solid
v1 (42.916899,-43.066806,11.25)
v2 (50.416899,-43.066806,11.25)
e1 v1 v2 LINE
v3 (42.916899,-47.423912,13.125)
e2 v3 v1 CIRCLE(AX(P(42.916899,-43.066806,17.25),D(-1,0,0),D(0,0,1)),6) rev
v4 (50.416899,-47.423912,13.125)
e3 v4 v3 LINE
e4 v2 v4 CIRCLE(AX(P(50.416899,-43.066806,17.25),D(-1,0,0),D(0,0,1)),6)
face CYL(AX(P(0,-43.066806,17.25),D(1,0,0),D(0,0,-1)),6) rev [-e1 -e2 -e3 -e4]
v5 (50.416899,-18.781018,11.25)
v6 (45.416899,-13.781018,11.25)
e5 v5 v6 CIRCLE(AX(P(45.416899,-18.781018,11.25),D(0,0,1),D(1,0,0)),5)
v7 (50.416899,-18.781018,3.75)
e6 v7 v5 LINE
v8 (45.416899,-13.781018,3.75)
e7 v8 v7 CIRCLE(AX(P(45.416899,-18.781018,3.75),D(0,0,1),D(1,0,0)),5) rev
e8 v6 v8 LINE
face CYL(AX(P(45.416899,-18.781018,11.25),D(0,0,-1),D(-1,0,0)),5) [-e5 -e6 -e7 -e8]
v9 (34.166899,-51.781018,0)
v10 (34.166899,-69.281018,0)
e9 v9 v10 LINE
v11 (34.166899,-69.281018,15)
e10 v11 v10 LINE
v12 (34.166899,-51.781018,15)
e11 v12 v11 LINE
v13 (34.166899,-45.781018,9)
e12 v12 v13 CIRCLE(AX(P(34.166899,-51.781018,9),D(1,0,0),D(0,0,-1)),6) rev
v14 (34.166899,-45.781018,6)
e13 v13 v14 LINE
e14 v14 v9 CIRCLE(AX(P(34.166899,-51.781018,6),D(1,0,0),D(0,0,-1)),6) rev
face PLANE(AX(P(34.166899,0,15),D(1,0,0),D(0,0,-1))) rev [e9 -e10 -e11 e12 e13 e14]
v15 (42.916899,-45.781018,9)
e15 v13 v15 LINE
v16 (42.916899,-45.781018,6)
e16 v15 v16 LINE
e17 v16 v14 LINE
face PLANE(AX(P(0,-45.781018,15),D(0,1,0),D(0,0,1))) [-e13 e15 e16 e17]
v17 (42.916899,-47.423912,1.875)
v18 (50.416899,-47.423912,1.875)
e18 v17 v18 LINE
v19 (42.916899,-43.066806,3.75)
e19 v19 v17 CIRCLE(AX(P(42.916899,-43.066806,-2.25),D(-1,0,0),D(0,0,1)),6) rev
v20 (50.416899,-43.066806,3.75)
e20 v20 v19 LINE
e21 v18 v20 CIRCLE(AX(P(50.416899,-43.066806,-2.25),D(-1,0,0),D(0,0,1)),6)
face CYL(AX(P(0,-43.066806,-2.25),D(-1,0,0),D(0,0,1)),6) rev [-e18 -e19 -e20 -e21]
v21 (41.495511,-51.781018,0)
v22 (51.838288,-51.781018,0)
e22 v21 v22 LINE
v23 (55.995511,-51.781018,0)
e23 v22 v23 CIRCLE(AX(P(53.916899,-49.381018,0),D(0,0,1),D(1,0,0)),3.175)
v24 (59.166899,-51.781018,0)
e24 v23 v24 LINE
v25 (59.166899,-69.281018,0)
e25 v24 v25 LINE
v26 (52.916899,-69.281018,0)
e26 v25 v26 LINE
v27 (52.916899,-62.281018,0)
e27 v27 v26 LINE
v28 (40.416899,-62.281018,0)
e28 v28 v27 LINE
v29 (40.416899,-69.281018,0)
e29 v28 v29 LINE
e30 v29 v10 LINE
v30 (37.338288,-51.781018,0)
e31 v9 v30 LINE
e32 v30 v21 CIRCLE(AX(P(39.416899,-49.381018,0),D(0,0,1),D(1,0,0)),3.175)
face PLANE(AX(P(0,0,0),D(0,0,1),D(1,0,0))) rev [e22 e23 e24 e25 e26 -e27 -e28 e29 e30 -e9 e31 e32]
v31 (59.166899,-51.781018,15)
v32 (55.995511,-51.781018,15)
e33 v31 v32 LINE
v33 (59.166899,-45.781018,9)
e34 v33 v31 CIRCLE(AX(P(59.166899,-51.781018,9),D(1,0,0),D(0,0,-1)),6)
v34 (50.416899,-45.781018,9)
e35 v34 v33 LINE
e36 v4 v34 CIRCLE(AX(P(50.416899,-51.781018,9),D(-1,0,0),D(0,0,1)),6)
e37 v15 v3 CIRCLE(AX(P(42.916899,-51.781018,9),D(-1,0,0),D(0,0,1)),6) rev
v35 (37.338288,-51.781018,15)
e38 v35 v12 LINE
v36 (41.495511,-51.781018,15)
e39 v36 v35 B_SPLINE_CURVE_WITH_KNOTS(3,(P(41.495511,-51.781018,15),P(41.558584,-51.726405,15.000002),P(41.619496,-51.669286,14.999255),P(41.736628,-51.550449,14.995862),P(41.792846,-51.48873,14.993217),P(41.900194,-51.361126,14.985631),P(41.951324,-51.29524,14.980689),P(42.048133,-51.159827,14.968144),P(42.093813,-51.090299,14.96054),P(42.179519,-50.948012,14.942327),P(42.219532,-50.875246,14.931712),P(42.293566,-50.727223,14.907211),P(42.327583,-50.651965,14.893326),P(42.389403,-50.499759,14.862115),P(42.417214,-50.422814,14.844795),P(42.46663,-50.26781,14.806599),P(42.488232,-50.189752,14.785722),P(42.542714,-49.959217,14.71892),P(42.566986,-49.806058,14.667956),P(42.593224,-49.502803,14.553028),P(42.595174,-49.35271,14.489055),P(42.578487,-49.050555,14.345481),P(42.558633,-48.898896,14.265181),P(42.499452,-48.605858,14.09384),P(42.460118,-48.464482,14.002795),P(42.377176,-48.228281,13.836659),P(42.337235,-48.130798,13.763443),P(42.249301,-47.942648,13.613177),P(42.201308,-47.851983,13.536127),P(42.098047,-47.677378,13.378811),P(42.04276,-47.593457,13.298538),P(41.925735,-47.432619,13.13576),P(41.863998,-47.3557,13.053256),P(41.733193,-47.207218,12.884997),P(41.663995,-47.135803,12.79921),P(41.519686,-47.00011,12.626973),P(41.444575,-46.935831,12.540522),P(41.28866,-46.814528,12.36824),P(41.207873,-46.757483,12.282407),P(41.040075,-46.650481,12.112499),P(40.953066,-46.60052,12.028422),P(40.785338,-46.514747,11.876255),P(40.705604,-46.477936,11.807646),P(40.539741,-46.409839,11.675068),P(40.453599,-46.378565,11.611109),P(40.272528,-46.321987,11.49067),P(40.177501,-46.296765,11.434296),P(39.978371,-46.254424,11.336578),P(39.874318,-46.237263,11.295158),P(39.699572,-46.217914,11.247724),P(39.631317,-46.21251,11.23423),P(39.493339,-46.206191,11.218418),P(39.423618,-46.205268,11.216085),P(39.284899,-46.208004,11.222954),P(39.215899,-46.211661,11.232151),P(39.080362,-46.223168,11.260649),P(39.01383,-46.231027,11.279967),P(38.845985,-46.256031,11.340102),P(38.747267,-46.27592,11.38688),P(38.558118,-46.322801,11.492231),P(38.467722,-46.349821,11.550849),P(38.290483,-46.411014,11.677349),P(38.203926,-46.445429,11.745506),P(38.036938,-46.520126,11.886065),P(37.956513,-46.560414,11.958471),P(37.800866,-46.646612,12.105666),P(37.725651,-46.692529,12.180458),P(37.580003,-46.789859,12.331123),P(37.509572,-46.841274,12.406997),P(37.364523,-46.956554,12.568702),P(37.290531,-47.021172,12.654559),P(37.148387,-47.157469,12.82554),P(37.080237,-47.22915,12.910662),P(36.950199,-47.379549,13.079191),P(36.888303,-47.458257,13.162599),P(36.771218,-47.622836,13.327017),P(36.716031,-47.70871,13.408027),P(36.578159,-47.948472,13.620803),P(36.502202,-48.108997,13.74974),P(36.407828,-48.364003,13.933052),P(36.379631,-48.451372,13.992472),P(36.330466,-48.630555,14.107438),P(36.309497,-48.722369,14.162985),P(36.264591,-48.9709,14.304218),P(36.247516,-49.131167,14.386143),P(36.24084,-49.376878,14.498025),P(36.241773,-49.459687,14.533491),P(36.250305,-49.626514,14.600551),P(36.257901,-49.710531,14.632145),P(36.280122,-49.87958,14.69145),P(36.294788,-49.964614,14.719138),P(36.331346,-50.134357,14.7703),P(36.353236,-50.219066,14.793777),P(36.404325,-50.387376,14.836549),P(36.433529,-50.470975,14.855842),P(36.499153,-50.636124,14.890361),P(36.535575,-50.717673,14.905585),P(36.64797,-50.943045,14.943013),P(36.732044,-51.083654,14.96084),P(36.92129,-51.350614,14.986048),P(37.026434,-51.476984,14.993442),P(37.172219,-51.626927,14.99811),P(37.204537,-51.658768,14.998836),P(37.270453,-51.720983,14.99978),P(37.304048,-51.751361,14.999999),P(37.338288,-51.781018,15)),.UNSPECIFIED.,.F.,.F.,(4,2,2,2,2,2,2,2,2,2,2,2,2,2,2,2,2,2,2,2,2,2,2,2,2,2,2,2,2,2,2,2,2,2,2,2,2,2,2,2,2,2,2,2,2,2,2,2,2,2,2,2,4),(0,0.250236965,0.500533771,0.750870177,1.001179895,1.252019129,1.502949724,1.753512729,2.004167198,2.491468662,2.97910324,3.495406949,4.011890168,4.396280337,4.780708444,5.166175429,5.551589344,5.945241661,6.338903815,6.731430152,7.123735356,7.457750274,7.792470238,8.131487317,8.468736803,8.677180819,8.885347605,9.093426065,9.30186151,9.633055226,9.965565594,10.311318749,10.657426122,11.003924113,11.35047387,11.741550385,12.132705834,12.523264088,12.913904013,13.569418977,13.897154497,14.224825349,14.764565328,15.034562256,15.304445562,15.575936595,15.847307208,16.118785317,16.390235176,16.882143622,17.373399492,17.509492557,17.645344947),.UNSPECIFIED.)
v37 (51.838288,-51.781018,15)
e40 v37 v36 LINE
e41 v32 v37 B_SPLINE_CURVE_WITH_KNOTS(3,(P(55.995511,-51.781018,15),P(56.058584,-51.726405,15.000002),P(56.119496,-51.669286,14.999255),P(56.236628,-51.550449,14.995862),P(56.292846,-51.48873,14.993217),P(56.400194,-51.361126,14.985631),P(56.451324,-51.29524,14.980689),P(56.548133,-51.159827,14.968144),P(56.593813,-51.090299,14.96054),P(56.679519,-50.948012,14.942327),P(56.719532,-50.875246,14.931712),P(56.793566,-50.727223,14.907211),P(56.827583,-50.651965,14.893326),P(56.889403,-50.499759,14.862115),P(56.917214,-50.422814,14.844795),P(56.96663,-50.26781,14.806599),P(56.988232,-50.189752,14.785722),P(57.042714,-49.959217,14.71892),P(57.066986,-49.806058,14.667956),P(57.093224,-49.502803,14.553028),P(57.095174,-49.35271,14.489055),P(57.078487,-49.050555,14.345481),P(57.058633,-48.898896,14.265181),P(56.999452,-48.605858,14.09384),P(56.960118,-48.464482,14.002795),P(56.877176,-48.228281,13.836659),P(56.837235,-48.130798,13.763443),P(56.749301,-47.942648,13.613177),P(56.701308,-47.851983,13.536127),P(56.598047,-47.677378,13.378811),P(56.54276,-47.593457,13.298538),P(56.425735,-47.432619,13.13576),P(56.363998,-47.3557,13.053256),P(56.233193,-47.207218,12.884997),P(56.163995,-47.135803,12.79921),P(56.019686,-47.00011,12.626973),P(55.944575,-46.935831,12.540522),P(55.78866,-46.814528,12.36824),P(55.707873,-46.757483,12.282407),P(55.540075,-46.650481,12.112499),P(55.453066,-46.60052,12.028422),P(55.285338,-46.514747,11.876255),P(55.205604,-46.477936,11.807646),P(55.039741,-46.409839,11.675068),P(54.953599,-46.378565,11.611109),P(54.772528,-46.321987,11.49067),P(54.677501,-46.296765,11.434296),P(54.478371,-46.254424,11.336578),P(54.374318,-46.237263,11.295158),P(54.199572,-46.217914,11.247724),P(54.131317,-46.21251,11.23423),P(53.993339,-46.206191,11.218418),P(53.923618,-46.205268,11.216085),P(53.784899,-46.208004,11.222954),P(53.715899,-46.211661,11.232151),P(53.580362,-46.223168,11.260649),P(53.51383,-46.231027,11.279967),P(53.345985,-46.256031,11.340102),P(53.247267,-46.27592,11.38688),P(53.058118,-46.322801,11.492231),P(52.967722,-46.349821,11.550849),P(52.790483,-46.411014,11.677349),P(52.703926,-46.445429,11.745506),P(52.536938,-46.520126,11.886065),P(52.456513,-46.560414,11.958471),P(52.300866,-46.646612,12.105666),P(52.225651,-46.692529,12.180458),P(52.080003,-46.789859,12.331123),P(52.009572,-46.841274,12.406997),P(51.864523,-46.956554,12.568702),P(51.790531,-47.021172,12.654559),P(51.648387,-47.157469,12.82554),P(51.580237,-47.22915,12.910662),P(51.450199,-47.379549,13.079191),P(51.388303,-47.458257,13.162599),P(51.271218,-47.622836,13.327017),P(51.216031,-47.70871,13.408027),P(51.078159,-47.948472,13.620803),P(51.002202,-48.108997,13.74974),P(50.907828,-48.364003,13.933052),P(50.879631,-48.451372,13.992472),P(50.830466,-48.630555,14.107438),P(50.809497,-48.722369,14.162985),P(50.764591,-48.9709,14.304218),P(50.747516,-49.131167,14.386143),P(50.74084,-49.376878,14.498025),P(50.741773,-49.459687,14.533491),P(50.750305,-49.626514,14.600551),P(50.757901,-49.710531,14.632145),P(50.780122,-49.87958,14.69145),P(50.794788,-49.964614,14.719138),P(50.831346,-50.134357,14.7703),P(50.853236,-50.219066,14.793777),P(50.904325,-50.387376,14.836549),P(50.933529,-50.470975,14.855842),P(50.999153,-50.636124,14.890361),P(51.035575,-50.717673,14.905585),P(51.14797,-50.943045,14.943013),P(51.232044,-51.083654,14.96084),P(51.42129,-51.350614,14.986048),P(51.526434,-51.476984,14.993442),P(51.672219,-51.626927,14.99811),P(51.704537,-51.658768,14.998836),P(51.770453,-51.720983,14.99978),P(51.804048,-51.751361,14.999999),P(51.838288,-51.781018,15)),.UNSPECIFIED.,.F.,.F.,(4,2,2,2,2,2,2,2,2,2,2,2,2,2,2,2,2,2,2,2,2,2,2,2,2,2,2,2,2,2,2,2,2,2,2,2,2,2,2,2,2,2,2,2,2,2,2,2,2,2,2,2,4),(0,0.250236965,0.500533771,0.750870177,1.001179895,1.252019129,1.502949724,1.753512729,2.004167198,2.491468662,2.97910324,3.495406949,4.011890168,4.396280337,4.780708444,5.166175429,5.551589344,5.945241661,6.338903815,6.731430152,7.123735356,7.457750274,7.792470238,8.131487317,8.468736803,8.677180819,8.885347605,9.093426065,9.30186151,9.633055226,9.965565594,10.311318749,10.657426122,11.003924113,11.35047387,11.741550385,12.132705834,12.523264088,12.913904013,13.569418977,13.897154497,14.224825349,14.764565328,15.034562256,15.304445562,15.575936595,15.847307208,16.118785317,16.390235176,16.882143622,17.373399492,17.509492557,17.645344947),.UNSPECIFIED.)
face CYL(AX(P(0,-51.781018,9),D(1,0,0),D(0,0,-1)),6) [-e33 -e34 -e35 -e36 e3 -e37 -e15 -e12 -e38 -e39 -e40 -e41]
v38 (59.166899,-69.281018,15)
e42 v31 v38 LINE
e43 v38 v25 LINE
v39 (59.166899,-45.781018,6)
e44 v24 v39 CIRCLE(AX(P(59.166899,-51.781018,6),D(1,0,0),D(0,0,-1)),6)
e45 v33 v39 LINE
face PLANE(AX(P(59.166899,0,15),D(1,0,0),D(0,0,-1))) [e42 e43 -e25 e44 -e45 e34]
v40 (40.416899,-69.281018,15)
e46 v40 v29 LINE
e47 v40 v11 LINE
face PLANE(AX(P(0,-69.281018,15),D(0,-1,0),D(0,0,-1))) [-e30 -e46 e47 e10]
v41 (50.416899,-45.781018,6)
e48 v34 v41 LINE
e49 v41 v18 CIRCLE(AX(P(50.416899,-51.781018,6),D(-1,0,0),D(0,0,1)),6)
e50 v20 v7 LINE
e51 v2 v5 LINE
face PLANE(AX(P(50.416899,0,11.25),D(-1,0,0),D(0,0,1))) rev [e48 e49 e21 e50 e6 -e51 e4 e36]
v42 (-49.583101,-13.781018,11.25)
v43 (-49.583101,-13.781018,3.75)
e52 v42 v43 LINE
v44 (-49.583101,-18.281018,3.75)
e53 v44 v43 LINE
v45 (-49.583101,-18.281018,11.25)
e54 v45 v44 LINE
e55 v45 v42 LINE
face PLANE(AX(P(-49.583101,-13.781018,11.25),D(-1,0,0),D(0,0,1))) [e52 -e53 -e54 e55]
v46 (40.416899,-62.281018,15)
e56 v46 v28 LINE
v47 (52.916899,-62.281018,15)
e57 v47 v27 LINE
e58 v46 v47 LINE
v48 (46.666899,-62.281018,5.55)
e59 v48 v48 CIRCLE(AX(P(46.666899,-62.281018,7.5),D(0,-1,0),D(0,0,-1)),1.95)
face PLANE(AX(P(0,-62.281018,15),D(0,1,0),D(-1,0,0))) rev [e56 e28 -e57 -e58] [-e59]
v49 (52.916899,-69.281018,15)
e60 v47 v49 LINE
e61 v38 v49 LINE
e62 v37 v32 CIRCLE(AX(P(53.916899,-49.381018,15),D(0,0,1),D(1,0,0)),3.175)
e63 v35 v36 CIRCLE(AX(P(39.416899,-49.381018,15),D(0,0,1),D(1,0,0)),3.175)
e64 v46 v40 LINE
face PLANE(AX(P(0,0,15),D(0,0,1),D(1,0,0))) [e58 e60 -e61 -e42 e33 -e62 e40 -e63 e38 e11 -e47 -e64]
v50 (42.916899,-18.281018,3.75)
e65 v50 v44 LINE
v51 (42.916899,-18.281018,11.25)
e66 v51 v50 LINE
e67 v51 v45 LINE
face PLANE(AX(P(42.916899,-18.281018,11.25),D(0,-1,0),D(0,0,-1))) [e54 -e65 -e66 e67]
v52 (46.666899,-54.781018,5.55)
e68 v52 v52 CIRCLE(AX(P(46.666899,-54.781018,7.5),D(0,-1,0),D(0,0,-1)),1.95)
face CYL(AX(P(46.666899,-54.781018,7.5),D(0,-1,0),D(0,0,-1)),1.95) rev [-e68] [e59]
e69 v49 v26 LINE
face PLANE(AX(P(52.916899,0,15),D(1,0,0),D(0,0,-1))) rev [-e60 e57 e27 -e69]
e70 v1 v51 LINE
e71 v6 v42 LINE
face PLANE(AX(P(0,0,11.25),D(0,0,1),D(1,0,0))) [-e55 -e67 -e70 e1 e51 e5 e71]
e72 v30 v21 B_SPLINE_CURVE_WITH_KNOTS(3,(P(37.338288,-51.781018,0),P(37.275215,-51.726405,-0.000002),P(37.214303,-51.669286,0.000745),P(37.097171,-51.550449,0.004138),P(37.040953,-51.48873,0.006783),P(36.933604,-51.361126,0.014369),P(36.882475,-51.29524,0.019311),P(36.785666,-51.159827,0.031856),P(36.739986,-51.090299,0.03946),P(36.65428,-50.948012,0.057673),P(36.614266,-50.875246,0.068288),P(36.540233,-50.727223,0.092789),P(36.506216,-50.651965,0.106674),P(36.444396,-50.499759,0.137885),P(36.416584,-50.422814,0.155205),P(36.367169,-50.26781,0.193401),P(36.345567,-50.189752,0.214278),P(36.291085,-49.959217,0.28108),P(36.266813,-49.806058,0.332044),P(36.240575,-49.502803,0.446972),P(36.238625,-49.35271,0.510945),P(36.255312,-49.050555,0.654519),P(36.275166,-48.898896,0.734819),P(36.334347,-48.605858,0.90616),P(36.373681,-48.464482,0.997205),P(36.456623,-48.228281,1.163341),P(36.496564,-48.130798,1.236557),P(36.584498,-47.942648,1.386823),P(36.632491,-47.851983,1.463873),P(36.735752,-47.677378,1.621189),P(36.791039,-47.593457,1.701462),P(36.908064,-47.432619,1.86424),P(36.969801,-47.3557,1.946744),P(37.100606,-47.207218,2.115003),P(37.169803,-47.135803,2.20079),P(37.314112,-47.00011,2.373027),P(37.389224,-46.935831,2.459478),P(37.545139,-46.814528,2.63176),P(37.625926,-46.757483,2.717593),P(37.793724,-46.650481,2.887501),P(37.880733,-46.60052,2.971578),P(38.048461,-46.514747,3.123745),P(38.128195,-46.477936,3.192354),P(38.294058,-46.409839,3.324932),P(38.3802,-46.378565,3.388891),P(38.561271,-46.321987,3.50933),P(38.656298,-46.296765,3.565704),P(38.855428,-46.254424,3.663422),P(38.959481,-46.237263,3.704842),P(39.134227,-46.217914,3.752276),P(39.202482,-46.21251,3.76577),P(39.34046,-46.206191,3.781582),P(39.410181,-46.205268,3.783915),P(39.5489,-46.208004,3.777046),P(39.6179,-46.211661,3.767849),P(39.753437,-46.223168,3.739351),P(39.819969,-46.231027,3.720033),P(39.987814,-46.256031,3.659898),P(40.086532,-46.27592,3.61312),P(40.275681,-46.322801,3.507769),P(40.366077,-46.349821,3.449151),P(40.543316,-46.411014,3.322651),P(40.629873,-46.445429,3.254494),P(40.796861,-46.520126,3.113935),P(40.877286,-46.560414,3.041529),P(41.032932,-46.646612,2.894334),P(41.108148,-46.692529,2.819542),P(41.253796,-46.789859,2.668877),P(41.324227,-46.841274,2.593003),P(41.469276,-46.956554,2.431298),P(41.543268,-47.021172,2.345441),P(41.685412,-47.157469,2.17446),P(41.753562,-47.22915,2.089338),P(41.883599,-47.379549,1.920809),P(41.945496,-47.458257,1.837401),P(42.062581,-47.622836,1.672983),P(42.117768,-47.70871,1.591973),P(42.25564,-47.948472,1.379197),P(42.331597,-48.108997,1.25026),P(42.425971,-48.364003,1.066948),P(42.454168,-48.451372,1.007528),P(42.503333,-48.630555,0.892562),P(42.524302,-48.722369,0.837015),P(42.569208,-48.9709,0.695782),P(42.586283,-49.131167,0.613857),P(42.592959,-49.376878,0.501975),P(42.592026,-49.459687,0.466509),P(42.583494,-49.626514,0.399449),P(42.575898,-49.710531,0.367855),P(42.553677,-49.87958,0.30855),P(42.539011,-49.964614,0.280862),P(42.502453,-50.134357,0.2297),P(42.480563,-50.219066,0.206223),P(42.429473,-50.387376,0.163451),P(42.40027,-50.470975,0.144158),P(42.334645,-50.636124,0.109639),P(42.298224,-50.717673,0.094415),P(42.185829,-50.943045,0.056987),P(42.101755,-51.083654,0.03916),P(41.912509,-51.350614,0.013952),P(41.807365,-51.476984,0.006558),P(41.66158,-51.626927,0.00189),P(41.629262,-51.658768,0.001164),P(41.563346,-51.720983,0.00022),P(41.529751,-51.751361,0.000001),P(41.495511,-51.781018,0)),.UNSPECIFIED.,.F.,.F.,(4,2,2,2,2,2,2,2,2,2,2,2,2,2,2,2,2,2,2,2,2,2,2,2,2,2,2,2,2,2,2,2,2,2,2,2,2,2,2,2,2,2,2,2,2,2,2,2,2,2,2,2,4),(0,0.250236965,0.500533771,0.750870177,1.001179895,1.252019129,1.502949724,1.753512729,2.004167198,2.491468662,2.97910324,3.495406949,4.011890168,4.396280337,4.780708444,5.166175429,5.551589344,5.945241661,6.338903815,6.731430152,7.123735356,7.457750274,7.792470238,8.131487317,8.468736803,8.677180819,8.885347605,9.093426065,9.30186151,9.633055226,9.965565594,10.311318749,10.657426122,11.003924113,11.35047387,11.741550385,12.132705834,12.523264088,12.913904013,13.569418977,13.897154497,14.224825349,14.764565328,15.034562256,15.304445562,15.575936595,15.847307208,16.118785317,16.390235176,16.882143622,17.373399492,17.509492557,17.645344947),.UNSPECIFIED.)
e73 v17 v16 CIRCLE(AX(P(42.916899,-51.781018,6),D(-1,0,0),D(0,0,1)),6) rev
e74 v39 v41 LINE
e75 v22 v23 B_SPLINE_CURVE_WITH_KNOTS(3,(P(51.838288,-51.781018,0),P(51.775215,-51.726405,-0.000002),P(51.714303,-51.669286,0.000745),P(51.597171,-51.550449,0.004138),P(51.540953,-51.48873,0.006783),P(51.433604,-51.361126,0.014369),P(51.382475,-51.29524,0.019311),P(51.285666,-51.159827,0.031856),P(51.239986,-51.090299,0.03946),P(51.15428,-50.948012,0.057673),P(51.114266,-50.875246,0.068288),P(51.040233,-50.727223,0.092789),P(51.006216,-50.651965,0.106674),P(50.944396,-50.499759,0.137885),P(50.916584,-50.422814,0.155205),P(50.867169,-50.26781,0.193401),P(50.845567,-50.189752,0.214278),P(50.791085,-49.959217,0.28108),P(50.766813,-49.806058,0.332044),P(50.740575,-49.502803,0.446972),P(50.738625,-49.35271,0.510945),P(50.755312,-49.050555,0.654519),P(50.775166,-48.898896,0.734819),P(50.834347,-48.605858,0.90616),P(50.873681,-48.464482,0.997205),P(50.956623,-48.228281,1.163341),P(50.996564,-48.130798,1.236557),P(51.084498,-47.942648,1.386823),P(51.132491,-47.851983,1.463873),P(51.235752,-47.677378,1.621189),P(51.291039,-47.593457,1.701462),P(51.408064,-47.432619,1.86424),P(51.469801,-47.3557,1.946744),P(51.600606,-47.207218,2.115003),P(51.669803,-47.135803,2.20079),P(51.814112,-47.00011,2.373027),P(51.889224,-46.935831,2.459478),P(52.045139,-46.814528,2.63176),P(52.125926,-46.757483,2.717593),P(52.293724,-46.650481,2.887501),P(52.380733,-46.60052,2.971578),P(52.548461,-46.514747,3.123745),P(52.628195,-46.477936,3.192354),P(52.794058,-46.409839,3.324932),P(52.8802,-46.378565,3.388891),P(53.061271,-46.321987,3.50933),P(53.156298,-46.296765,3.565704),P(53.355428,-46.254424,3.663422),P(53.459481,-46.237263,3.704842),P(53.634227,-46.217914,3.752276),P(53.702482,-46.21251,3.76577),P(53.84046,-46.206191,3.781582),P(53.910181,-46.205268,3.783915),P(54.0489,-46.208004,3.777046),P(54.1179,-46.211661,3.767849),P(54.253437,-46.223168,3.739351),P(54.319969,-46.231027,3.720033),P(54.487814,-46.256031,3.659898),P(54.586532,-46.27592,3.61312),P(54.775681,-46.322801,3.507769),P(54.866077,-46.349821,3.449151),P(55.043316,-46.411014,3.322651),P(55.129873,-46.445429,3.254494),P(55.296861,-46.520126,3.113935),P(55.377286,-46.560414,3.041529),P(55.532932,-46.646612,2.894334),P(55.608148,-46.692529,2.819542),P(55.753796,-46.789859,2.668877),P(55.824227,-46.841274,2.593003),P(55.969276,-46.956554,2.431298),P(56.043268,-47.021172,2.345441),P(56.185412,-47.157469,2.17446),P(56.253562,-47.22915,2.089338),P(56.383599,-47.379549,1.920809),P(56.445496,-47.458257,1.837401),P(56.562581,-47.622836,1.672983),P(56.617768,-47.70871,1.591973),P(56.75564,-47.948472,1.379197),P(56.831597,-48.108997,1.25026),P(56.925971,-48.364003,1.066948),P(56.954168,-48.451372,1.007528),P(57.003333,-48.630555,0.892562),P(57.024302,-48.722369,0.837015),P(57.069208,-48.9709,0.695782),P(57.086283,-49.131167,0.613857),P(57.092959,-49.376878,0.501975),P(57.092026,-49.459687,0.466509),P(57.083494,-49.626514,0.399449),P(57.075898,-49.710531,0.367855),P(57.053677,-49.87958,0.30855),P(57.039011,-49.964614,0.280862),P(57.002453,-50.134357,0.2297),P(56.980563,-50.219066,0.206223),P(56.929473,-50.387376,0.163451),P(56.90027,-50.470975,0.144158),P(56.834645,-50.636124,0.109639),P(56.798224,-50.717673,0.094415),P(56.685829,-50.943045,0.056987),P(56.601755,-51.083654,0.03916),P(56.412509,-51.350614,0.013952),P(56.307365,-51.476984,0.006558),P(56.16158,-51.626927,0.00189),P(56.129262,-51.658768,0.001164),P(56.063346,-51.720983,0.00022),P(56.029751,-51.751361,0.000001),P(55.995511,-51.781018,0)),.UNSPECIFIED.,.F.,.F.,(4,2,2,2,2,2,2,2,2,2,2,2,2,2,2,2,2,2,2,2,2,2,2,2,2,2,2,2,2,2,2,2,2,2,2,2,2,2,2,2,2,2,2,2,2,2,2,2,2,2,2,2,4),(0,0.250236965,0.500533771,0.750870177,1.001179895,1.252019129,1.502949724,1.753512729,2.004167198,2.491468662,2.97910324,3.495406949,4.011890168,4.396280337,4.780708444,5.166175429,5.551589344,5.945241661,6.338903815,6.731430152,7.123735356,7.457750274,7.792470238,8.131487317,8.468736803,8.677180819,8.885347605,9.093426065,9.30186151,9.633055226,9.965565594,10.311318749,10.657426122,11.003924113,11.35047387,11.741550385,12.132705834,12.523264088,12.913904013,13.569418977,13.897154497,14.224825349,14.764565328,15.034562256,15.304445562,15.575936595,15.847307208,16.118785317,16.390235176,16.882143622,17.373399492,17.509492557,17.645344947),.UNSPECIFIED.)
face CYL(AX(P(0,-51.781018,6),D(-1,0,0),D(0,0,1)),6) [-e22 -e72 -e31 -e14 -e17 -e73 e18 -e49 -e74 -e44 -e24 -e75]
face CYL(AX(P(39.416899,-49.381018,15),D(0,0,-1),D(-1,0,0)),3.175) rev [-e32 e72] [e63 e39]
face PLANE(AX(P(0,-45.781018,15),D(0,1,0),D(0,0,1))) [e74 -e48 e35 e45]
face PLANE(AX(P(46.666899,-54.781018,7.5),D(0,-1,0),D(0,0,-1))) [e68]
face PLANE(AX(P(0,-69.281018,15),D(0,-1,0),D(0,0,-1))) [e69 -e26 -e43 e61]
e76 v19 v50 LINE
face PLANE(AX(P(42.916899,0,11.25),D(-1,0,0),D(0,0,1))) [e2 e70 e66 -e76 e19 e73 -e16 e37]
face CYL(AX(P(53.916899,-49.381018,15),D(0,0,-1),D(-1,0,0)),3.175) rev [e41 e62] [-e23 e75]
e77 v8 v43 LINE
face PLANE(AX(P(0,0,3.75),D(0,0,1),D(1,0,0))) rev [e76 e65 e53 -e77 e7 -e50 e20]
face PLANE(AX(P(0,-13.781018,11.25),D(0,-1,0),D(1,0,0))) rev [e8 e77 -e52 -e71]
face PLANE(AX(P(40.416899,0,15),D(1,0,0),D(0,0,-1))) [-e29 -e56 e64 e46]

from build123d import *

# Parameters (mm, degrees)
SKETCH1_R           = 3.175
PUSHER_BASE_DEPTH   = 15
SKETCH3_R           = 1.95
SCREW_HOLE_DEPTH    = 7.5
SKETCH6_W           = 7.5
SKETCH6_H           = 32
PUSHER_HEAD_DEPTH   = 3.75
FILLET1_R           = 6
FILLET5_R           = 6
FILLET6_R           = 6
SKETCH8_W           = 92.5
SKETCH8_H           = 4.5
BOSS_EXTRUDE1_DEPTH = 7.5
FILLET7_R           = 5


with BuildPart() as part:
    # Sketch1 → pusher base (new body)
    with BuildSketch(Plane.XY):
        Polygon((59.166899441, -45.781018283), (51.666899441, -45.781018283), (41.666899441, -45.781018283), (34.166899441, -45.781018283), (34.166899441, -69.281018283), (40.416899441, -69.281018283), (40.416899441, -62.281018283), (52.916899441, -62.281018283), (52.916899441, -69.281018283), (59.166899441, -69.281018283), align=None)
        with Locations((39.416899441, -49.381018283)):
            Circle(SKETCH1_R, mode=Mode.SUBTRACT)
        with Locations((53.916899441, -49.381018283)):
            Circle(SKETCH1_R, mode=Mode.SUBTRACT)
    extrude(amount=PUSHER_BASE_DEPTH)

    # Sketch3 → screw hole (cut)
    with BuildSketch(Plane.XZ.offset(62.281018283)):
        with Locations(Location((46.666899441, 7.5, 0), (0, 0, 270))):
            Circle(SKETCH3_R)
    extrude(amount=-SCREW_HOLE_DEPTH, mode=Mode.SUBTRACT)

    # Sketch6 → pusher head (add, symmetric)
    with BuildSketch(Plane.XY.offset(7.5)):
        with Locations((46.666899441, -29.781018283)):
            Rectangle(SKETCH6_W, SKETCH6_H)
    extrude(amount=PUSHER_HEAD_DEPTH, both=True)

    # Fillet1
    # the kernel refuses this fillet: 6 mm, written as the material it takes off along each edge
    with BuildSketch(Plane(origin=(74.166899441, -45.781018283, 0), x_dir=(0, 0, 1), z_dir=(-1, 0, 0))) as fillet1_piece_1_section:
        with BuildLine():
            CenterArc((FILLET1_R, -FILLET1_R), FILLET1_R, 90, 90)
            Line((0, -FILLET1_R), (0, 0))
            Line((0, 0), (FILLET1_R, 0))
        make_face()
    fillet1_piece_1 = extrude(amount=55, mode=Mode.PRIVATE)
    fillet1_piece_1 = split(fillet1_piece_1, bisect_by=Plane(origin=(62.291899441, -45.824840722, 3.75), z_dir=(0, 0, 1)), keep=Keep.TOP, mode=Mode.PRIVATE)
    fillet1_piece_1 = split(fillet1_piece_1, bisect_by=Plane(origin=(50.416899441, -45.824840722, 4.566140917), z_dir=(1, 0, 0)), keep=Keep.TOP, mode=Mode.PRIVATE)
    add(fillet1_piece_1, mode=Mode.SUBTRACT)
    with BuildSketch(Plane(origin=(74.166899441, -45.781018283, 0), x_dir=(0, 0, 1), z_dir=(-1, 0, 0))) as fillet1_piece_2_section:
        with BuildLine():
            CenterArc((FILLET1_R, -FILLET1_R), FILLET1_R, 90, 90)
            Line((0, -FILLET1_R), (0, 0))
            Line((0, 0), (FILLET1_R, 0))
        make_face()
    fillet1_piece_2 = extrude(amount=55, mode=Mode.PRIVATE)
    fillet1_piece_2 = split(fillet1_piece_2, bisect_by=Plane(origin=(62.291899441, -47.230240291, 3.75), z_dir=(0, 0, -1)), keep=Keep.TOP, mode=Mode.PRIVATE)
    fillet1_piece_2 = split(fillet1_piece_2, bisect_by=Plane(origin=(50.416899441, -47.230240291, 1.136674626), z_dir=(1, 0, 0)), keep=Keep.TOP, mode=Mode.PRIVATE)
    add(fillet1_piece_2, mode=Mode.SUBTRACT)
    with BuildSketch(Plane(origin=(74.166899441, -45.781018283, 0), x_dir=(0, 0, 1), z_dir=(-1, 0, 0))) as fillet1_piece_3_section:
        with BuildLine():
            CenterArc((FILLET1_R, -FILLET1_R), FILLET1_R, 90, 90)
            Line((0, -FILLET1_R), (0, 0))
            Line((0, 0), (FILLET1_R, 0))
        make_face()
    fillet1_piece_3 = extrude(amount=55, mode=Mode.PRIVATE)
    fillet1_piece_3 = split(fillet1_piece_3, bisect_by=Plane(origin=(46.666899441, -47.230240291, 3.75), z_dir=(0, 0, -1)), keep=Keep.TOP, mode=Mode.PRIVATE)
    fillet1_piece_3 = split(fillet1_piece_3, bisect_by=Plane(origin=(50.416899441, -47.230240291, 1.136674626), z_dir=(-1, 0, 0)), keep=Keep.TOP, mode=Mode.PRIVATE)
    fillet1_piece_3 = split(fillet1_piece_3, bisect_by=Plane(origin=(42.916899441, -47.230240291, 1.136674626), z_dir=(1, 0, 0)), keep=Keep.TOP, mode=Mode.PRIVATE)
    add(fillet1_piece_3, mode=Mode.SUBTRACT)
    with BuildSketch(Plane(origin=(74.166899441, -45.781018283, 0), x_dir=(0, 0, 1), z_dir=(-1, 0, 0))) as fillet1_piece_4_section:
        with BuildLine():
            CenterArc((FILLET1_R, -FILLET1_R), FILLET1_R, 90, 90)
            Line((0, -FILLET1_R), (0, 0))
            Line((0, 0), (FILLET1_R, 0))
        make_face()
    fillet1_piece_4 = extrude(amount=55, mode=Mode.PRIVATE)
    fillet1_piece_4 = split(fillet1_piece_4, bisect_by=Plane(origin=(31.041899441, -45.824840722, 3.75), z_dir=(0, 0, 1)), keep=Keep.TOP, mode=Mode.PRIVATE)
    fillet1_piece_4 = split(fillet1_piece_4, bisect_by=Plane(origin=(42.916899441, -45.824840722, 4.566140917), z_dir=(-1, 0, 0)), keep=Keep.TOP, mode=Mode.PRIVATE)
    add(fillet1_piece_4, mode=Mode.SUBTRACT)
    with BuildSketch(Plane(origin=(74.166899441, -45.781018283, 0), x_dir=(0, 0, 1), z_dir=(-1, 0, 0))) as fillet1_piece_5_section:
        with BuildLine():
            CenterArc((FILLET1_R, -FILLET1_R), FILLET1_R, 90, 90)
            Line((0, -FILLET1_R), (0, 0))
            Line((0, 0), (FILLET1_R, 0))
        make_face()
    fillet1_piece_5 = extrude(amount=55, mode=Mode.PRIVATE)
    fillet1_piece_5 = split(fillet1_piece_5, bisect_by=Plane(origin=(31.041899441, -47.230240291, 3.75), z_dir=(0, 0, -1)), keep=Keep.TOP, mode=Mode.PRIVATE)
    fillet1_piece_5 = split(fillet1_piece_5, bisect_by=Plane(origin=(42.916899441, -47.230240291, 1.136674626), z_dir=(-1, 0, 0)), keep=Keep.TOP, mode=Mode.PRIVATE)
    add(fillet1_piece_5, mode=Mode.SUBTRACT)
    with BuildSketch(Plane(origin=(19.166899441, -45.781018283, 15), x_dir=(0, 0, -1), z_dir=(1, 0, 0))) as fillet1_piece_6_section:
        with BuildLine():
            CenterArc((FILLET1_R, -FILLET1_R), FILLET1_R, 90, 90)
            Line((0, -FILLET1_R), (0, 0))
            Line((0, 0), (FILLET1_R, 0))
        make_face()
    fillet1_piece_6 = extrude(amount=55, mode=Mode.PRIVATE)
    fillet1_piece_6 = split(fillet1_piece_6, bisect_by=Plane(origin=(31.041899441, -45.824840722, 11.25), z_dir=(0, 0, -1)), keep=Keep.TOP, mode=Mode.PRIVATE)
    fillet1_piece_6 = split(fillet1_piece_6, bisect_by=Plane(origin=(42.916899441, -45.824840722, 10.433859083), z_dir=(-1, 0, 0)), keep=Keep.TOP, mode=Mode.PRIVATE)
    add(fillet1_piece_6, mode=Mode.SUBTRACT)
    with BuildSketch(Plane(origin=(19.166899441, -45.781018283, 15), x_dir=(0, 0, -1), z_dir=(1, 0, 0))) as fillet1_piece_7_section:
        with BuildLine():
            CenterArc((FILLET1_R, -FILLET1_R), FILLET1_R, 90, 90)
            Line((0, -FILLET1_R), (0, 0))
            Line((0, 0), (FILLET1_R, 0))
        make_face()
    fillet1_piece_7 = extrude(amount=55, mode=Mode.PRIVATE)
    fillet1_piece_7 = split(fillet1_piece_7, bisect_by=Plane(origin=(31.041899441, -47.230240291, 11.25), z_dir=(0, 0, 1)), keep=Keep.TOP, mode=Mode.PRIVATE)
    fillet1_piece_7 = split(fillet1_piece_7, bisect_by=Plane(origin=(42.916899441, -47.230240291, 13.863325374), z_dir=(-1, 0, 0)), keep=Keep.TOP, mode=Mode.PRIVATE)
    add(fillet1_piece_7, mode=Mode.SUBTRACT)
    with BuildSketch(Plane(origin=(19.166899441, -45.781018283, 15), x_dir=(0, 0, -1), z_dir=(1, 0, 0))) as fillet1_piece_8_section:
        with BuildLine():
            CenterArc((FILLET1_R, -FILLET1_R), FILLET1_R, 90, 90)
            Line((0, -FILLET1_R), (0, 0))
            Line((0, 0), (FILLET1_R, 0))
        make_face()
    fillet1_piece_8 = extrude(amount=55, mode=Mode.PRIVATE)
    fillet1_piece_8 = split(fillet1_piece_8, bisect_by=Plane(origin=(50.416899441, -47.230240291, 13.863325374), z_dir=(-1, 0, 0)), keep=Keep.TOP, mode=Mode.PRIVATE)
    fillet1_piece_8 = split(fillet1_piece_8, bisect_by=Plane(origin=(46.666899441, -47.230240291, 11.25), z_dir=(0, 0, 1)), keep=Keep.TOP, mode=Mode.PRIVATE)
    fillet1_piece_8 = split(fillet1_piece_8, bisect_by=Plane(origin=(42.916899441, -47.230240291, 13.863325374), z_dir=(1, 0, 0)), keep=Keep.TOP, mode=Mode.PRIVATE)
    add(fillet1_piece_8, mode=Mode.SUBTRACT)
    with BuildSketch(Plane(origin=(19.166899441, -45.781018283, 15), x_dir=(0, 0, -1), z_dir=(1, 0, 0))) as fillet1_piece_9_section:
        with BuildLine():
            CenterArc((FILLET1_R, -FILLET1_R), FILLET1_R, 90, 90)
            Line((0, -FILLET1_R), (0, 0))
            Line((0, 0), (FILLET1_R, 0))
        make_face()
    fillet1_piece_9 = extrude(amount=55, mode=Mode.PRIVATE)
    fillet1_piece_9 = split(fillet1_piece_9, bisect_by=Plane(origin=(50.416899441, -45.824840722, 10.433859083), z_dir=(1, 0, 0)), keep=Keep.TOP, mode=Mode.PRIVATE)
    fillet1_piece_9 = split(fillet1_piece_9, bisect_by=Plane(origin=(62.291899441, -45.824840722, 11.25), z_dir=(0, 0, -1)), keep=Keep.TOP, mode=Mode.PRIVATE)
    add(fillet1_piece_9, mode=Mode.SUBTRACT)
    with BuildSketch(Plane(origin=(19.166899441, -45.781018283, 15), x_dir=(0, 0, -1), z_dir=(1, 0, 0))) as fillet1_piece_10_section:
        with BuildLine():
            CenterArc((FILLET1_R, -FILLET1_R), FILLET1_R, 90, 90)
            Line((0, -FILLET1_R), (0, 0))
            Line((0, 0), (FILLET1_R, 0))
        make_face()
    fillet1_piece_10 = extrude(amount=55, mode=Mode.PRIVATE)
    fillet1_piece_10 = split(fillet1_piece_10, bisect_by=Plane(origin=(50.416899441, -47.230240291, 13.863325374), z_dir=(1, 0, 0)), keep=Keep.TOP, mode=Mode.PRIVATE)
    fillet1_piece_10 = split(fillet1_piece_10, bisect_by=Plane(origin=(62.291899441, -47.230240291, 11.25), z_dir=(0, 0, 1)), keep=Keep.TOP, mode=Mode.PRIVATE)
    add(fillet1_piece_10, mode=Mode.SUBTRACT)

    # Fillet5
    fillet5_edges = [part.edges().sort_by_distance(p)[0] for p in [
        (46.666899441, -46.218869418, 11.25),
    ]]
    fillet(fillet5_edges, radius=FILLET5_R)

    # Fillet6
    fillet6_edges = [part.edges().sort_by_distance(p)[0] for p in [
        (46.666899441, -46.218869418, 3.75),
    ]]
    fillet(fillet6_edges, radius=FILLET6_R)

    # Sketch8 → Boss-Extrude1 (add)
    with BuildSketch(Plane(origin=(0, 0, 3.75), x_dir=(-1, 0, 0), z_dir=(0, 0, -1))):
        with Locations((3.333100559, -16.031018283)):
            Rectangle(SKETCH8_W, SKETCH8_H)
    extrude(amount=-BOSS_EXTRUDE1_DEPTH)

    # Fillet7
    fillet7_edges = [part.edges().sort_by_distance(p)[0] for p in [
        (50.416899441, -13.781018283, 7.5),
    ]]
    fillet(fillet7_edges, radius=FILLET7_R)


solid = part.part
